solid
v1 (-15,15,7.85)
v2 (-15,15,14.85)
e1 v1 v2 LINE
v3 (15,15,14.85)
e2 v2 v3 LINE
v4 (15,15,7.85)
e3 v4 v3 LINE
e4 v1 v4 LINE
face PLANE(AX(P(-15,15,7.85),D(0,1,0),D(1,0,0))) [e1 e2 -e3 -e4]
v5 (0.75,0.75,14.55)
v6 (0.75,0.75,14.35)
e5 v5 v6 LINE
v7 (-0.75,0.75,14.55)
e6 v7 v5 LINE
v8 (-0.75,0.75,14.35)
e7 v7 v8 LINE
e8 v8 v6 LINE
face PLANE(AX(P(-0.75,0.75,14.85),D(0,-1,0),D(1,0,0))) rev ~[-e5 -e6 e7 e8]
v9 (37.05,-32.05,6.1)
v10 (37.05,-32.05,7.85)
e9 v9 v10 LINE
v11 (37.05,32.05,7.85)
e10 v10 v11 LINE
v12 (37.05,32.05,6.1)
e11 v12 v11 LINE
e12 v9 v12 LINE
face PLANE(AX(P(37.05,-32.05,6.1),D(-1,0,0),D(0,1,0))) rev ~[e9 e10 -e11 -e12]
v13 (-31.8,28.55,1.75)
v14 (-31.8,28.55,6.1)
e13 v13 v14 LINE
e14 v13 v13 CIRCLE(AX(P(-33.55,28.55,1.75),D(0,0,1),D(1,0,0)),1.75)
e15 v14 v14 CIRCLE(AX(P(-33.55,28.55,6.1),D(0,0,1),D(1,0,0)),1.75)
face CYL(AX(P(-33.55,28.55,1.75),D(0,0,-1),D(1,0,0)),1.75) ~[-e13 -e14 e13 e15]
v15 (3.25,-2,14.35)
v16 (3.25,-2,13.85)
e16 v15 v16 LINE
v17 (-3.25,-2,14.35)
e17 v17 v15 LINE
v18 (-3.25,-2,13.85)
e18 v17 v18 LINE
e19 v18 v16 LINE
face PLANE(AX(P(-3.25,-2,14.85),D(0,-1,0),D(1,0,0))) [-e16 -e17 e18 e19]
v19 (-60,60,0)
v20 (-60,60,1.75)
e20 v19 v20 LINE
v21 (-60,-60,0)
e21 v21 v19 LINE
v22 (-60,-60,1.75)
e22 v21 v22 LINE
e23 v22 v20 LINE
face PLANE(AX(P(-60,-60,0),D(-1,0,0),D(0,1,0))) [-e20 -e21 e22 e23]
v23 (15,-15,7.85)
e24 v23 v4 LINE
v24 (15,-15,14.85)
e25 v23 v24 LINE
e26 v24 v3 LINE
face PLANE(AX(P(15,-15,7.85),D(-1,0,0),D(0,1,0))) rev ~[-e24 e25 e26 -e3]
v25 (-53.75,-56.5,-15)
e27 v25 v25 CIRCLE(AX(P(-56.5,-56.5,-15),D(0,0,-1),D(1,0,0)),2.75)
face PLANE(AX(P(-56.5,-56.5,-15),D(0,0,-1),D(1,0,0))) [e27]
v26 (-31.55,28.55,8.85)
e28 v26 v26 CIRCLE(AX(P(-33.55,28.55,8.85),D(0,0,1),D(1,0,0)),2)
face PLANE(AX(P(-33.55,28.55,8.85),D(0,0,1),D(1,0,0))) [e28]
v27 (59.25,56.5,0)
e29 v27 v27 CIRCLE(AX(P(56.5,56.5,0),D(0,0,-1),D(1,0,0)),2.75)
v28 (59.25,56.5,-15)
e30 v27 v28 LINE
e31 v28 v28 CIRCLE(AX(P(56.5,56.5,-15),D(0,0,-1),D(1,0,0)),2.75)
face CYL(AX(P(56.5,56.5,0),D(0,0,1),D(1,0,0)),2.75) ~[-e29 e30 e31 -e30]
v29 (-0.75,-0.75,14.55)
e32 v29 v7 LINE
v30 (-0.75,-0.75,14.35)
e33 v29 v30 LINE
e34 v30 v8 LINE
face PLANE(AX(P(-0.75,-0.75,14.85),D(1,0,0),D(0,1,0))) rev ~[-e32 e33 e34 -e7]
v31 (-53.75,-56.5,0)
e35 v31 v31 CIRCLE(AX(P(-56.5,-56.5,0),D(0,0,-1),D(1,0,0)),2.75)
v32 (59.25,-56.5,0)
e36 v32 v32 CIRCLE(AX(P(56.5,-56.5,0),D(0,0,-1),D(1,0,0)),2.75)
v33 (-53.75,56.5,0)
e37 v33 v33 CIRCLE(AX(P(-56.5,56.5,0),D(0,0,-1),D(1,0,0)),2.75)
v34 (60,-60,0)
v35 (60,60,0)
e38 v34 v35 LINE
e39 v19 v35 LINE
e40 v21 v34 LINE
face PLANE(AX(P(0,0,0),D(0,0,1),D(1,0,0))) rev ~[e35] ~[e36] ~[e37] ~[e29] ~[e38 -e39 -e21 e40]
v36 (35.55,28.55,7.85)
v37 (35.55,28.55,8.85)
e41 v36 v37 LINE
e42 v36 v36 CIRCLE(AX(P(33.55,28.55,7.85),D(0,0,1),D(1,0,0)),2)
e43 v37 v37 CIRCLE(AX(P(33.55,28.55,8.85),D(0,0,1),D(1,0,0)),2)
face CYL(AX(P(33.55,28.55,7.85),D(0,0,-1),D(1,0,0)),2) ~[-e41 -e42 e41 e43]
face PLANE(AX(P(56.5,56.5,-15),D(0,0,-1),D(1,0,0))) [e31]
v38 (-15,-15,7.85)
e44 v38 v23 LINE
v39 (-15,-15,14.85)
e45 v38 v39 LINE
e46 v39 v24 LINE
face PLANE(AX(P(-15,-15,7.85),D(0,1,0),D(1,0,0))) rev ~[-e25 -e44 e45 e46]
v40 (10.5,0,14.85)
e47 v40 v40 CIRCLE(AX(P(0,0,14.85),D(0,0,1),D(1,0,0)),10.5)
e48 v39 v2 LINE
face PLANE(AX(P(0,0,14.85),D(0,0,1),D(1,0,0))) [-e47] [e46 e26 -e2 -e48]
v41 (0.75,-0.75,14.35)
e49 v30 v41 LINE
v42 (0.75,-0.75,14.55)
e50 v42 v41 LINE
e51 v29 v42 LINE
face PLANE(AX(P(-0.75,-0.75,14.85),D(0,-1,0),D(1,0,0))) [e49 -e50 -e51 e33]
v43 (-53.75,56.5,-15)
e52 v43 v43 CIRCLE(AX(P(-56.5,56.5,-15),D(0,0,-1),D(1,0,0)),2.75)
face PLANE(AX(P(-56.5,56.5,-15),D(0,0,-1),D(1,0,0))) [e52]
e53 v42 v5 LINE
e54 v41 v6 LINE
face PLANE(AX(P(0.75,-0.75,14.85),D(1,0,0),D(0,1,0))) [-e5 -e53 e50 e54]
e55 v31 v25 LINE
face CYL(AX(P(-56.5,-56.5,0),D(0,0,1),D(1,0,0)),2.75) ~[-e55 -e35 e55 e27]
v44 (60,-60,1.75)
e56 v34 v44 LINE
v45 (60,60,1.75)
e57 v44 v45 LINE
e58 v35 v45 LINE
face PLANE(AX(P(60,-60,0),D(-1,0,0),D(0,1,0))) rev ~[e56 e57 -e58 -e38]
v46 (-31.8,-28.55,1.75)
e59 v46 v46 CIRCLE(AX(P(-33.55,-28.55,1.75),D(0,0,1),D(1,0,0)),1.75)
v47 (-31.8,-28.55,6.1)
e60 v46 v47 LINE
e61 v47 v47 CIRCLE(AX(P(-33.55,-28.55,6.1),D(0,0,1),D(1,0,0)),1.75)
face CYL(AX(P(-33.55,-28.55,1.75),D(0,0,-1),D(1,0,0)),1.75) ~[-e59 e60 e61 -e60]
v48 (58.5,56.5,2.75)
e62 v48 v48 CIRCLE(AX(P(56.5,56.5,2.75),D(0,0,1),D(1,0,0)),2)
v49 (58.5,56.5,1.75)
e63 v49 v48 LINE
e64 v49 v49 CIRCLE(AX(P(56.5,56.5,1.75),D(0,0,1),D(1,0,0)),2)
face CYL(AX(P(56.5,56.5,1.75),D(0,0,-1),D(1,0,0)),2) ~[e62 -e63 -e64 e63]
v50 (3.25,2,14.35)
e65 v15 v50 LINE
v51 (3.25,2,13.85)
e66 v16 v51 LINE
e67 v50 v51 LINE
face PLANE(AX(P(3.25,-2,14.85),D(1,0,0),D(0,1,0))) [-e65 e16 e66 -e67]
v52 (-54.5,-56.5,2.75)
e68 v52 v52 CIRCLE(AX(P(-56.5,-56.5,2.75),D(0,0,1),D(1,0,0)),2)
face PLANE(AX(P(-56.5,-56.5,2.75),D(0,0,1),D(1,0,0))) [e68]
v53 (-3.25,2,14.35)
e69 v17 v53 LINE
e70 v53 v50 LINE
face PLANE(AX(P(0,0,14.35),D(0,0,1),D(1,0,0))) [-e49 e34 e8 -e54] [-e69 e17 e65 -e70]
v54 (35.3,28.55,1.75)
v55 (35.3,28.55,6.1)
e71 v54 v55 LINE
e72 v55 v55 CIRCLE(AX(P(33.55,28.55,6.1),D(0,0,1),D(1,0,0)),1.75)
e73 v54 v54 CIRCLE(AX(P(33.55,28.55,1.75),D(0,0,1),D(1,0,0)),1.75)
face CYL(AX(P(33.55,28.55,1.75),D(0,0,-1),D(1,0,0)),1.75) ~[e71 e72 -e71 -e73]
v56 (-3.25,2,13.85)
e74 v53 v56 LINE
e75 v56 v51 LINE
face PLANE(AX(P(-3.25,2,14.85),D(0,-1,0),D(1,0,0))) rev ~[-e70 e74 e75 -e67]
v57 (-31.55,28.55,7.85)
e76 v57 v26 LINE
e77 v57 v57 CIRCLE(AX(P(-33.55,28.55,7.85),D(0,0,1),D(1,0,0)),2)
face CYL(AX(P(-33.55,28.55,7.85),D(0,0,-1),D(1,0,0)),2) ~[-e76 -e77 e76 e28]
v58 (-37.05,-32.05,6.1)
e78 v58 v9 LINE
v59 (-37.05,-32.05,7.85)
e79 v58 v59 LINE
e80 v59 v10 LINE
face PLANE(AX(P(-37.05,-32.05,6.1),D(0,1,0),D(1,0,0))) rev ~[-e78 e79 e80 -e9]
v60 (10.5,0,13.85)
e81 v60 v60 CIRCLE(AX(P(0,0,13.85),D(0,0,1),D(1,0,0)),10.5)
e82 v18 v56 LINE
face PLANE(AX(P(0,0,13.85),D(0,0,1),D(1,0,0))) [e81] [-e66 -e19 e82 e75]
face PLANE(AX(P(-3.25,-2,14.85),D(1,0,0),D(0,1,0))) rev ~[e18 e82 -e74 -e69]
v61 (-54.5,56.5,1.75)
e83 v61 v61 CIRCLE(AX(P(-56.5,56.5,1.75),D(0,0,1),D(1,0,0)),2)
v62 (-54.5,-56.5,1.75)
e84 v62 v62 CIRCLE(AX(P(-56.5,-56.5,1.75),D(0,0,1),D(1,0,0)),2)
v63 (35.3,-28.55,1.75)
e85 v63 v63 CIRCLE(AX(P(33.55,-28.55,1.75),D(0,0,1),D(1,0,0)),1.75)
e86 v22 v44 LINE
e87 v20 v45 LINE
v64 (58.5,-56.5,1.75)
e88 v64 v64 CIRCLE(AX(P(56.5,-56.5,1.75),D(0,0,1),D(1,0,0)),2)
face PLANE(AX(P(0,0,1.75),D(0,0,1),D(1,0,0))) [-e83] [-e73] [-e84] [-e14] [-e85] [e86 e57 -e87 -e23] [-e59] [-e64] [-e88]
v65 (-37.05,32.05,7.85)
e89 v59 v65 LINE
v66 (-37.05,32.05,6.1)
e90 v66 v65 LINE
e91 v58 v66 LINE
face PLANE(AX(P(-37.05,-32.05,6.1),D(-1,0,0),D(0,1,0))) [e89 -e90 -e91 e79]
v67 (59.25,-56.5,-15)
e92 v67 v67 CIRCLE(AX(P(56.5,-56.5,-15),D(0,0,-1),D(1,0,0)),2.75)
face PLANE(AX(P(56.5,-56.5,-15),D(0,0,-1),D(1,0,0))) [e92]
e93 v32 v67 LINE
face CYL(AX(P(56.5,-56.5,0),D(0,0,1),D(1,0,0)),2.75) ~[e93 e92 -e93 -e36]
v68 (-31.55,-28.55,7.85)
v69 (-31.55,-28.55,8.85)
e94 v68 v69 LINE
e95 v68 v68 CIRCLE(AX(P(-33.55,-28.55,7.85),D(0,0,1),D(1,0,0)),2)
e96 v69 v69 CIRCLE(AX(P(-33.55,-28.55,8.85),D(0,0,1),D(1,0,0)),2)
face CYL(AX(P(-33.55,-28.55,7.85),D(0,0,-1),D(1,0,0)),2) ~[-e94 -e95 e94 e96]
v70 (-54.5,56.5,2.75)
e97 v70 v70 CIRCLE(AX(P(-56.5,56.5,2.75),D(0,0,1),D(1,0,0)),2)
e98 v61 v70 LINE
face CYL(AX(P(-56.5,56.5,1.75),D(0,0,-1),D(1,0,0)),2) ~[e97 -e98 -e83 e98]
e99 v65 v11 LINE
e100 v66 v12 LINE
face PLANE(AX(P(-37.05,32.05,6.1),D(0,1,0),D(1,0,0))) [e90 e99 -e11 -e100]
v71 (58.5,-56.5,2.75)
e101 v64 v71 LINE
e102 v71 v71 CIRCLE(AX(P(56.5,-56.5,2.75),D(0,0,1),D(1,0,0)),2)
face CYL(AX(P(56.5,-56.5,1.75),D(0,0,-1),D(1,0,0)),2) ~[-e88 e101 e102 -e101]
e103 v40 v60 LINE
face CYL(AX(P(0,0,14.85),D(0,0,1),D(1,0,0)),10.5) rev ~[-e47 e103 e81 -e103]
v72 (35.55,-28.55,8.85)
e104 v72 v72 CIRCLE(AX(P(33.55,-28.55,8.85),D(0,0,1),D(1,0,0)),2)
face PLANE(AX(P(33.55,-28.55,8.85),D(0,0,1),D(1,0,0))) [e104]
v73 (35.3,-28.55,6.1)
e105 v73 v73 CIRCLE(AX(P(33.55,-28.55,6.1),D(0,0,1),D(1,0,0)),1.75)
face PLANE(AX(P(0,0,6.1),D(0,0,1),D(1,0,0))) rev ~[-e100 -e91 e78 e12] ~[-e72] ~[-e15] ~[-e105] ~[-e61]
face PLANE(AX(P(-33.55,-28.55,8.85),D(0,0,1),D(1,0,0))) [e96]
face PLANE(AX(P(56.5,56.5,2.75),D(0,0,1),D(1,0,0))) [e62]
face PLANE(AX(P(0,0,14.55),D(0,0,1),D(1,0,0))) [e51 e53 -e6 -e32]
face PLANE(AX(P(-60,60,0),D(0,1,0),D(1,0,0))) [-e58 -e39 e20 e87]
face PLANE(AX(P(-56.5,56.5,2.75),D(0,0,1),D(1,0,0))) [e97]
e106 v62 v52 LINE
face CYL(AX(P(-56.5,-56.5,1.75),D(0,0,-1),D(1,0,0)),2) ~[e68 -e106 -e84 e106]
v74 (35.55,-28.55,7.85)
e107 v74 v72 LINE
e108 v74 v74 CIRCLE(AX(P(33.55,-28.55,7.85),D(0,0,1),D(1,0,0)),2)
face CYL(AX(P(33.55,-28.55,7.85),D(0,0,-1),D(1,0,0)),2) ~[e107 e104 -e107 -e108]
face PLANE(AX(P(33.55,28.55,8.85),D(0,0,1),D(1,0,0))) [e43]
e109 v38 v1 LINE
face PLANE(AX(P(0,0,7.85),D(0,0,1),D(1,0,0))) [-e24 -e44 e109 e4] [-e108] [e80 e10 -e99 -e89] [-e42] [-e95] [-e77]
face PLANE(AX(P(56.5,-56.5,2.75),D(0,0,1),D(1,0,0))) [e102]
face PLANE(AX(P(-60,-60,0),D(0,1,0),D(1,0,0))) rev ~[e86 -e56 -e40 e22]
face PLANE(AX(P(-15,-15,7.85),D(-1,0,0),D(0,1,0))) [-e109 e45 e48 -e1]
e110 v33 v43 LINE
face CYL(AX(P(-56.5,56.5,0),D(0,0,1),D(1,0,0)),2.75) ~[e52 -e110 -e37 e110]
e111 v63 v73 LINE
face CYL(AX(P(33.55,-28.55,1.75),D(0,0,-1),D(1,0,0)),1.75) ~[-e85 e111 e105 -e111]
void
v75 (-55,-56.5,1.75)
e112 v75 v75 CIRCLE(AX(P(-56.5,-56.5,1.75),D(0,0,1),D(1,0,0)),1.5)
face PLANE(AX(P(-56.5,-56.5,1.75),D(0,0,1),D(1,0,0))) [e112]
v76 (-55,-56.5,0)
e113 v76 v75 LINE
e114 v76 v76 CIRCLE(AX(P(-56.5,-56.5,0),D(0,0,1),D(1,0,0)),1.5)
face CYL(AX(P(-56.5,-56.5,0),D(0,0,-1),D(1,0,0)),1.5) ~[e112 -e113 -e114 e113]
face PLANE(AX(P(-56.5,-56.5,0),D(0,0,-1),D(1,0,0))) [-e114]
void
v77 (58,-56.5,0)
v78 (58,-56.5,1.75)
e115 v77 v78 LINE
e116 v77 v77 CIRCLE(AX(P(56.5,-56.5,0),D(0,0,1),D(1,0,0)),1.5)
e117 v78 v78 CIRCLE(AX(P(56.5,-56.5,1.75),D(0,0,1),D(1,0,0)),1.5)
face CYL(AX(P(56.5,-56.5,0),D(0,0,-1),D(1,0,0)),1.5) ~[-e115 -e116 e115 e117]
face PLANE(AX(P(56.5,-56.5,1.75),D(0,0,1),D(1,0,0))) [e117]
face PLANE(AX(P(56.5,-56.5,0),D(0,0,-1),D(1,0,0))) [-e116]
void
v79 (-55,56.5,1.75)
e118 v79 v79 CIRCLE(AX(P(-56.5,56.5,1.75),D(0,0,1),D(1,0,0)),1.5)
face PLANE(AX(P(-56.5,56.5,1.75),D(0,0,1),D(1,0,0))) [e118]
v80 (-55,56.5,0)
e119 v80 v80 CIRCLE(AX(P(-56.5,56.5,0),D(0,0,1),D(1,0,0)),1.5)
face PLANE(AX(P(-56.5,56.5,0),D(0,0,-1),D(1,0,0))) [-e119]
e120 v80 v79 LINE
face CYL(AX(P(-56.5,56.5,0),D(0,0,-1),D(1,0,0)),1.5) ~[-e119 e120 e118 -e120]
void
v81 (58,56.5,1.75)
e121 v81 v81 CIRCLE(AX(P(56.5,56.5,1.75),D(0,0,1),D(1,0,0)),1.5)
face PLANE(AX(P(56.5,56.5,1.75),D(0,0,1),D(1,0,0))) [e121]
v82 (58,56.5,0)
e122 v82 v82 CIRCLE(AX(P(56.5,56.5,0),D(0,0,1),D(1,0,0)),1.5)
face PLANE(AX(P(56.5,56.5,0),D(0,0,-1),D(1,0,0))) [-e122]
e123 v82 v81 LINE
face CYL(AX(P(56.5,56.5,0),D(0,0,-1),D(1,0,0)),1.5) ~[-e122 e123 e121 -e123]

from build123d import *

# Parameters (mm, degrees)
F0_W      = 120
F0_H      = 120
F0_R      = 1.5
F1_DEPTH  = 1.75
F2_R      = 2.75
F2_R_2    = 1.5
F3_DEPTH  = 15
F4_R      = 2
F4_R_2    = 1.5
F5_DEPTH  = 1
F4_R_3    = 1.75
F6_DEPTH  = 4.35
F7_W      = 74.1
F7_H      = 64.1
F8_DEPTH  = 1.75
F9_R      = 2
F10_DEPTH = 1
F9_W      = 30
F9_H      = 30
F11_DEPTH = 7
F12_R     = 10.5
F12_W     = 6.5
F12_H     = 4
F13_DEPTH = 1
F12_W_2   = 1.5
F12_H_2   = 1.5
F14_DEPTH = 0.3
F15_DEPTH = 0.5


with BuildPart() as f1:
    # F0 (on Top) → F1 (new body)
    with BuildSketch(Plane.XY):
        Rectangle(F0_W, F0_H)
        with Locations((-56.5, -56.5)):
            Circle(F0_R, mode=Mode.SUBTRACT)
        with Locations((56.5, -56.5)):
            Circle(F0_R, mode=Mode.SUBTRACT)
        with Locations((-56.5, 56.5)):
            Circle(F0_R, mode=Mode.SUBTRACT)
        with Locations((56.5, 56.5)):
            Circle(F0_R, mode=Mode.SUBTRACT)
    extrude(amount=F1_DEPTH)

    # F2 (on face) → F3 (join)
    with BuildSketch(Plane(origin=(0, 0, 0), x_dir=(1, 0, 0), z_dir=(0, 0, -1))):
        with Locations((56.5, -56.5)):
            Circle(F2_R)
        with Locations((56.5, -56.5)):
            Circle(F2_R_2, mode=Mode.SUBTRACT)
        with Locations((-56.5, -56.5)):
            Circle(F2_R)
        with Locations((-56.5, -56.5)):
            Circle(F2_R_2, mode=Mode.SUBTRACT)
        with Locations((-56.5, 56.5)):
            Circle(F2_R)
        with Locations((-56.5, 56.5)):
            Circle(F2_R_2, mode=Mode.SUBTRACT)
        with Locations((56.5, 56.5)):
            Circle(F2_R)
        with Locations((56.5, 56.5)):
            Circle(F2_R_2, mode=Mode.SUBTRACT)
        with Locations((-56.5, 56.5)):
            Circle(F2_R_2)
        with Locations((56.5, 56.5)):
            Circle(F2_R_2)
        with Locations((-56.5, -56.5)):
            Circle(F2_R_2)
        with Locations((56.5, -56.5)):
            Circle(F2_R_2)
    extrude(amount=F3_DEPTH)

    # F4 (on face) → F5 (join)
    with BuildSketch(Plane.XY.offset(1.75)):
        with Locations((-56.5, 56.5)):
            Circle(F4_R)
        with Locations((-56.5, 56.5)):
            Circle(F4_R_2, mode=Mode.SUBTRACT)
        with Locations((-56.5, 56.5)):
            Circle(F4_R_2)
        with Locations((56.5, 56.5)):
            Circle(F4_R)
        with Locations((56.5, 56.5)):
            Circle(F4_R_2, mode=Mode.SUBTRACT)
        with Locations((56.5, 56.5)):
            Circle(F4_R_2)
        with Locations((56.5, -56.5)):
            Circle(F4_R)
        with Locations((56.5, -56.5)):
            Circle(F4_R_2, mode=Mode.SUBTRACT)
        with Locations((56.5, -56.5)):
            Circle(F4_R_2)
        with Locations((-56.5, -56.5)):
            Circle(F4_R)
        with Locations((-56.5, -56.5)):
            Circle(F4_R_2, mode=Mode.SUBTRACT)
        with Locations((-56.5, -56.5)):
            Circle(F4_R_2)
    extrude(amount=F5_DEPTH)

    # F4 (on face) → F6 (join)
    with BuildSketch(Plane.XY.offset(1.75)):
        with Locations((-33.55, -28.55)):
            Circle(F4_R_3)
        with Locations((33.55, -28.55)):
            Circle(F4_R_3)
        with Locations((33.55, 28.55)):
            Circle(F4_R_3)
        with Locations((-33.55, 28.55)):
            Circle(F4_R_3)
    extrude(amount=F6_DEPTH)

    # F7 (on face) → F8 (join)
    with BuildSketch(Plane.XY.offset(6.1)):
        Rectangle(F7_W, F7_H)
    extrude(amount=F8_DEPTH)

    # F9 (on face) → F10 (join)
    with BuildSketch(Plane.XY.offset(7.85)):
        with Locations((33.55, 28.55)):
            Circle(F9_R)
        with Locations((-33.55, 28.55)):
            Circle(F9_R)
        with Locations((33.55, -28.55)):
            Circle(F9_R)
        with Locations((-33.55, -28.55)):
            Circle(F9_R)
    extrude(amount=F10_DEPTH)

    # F9 (on face) → F11 (join)
    with BuildSketch(Plane.XY.offset(7.85)):
        Rectangle(F9_W, F9_H)
    extrude(amount=F11_DEPTH)

    # F12 (on face) → F13 (cut)
    with BuildSketch(Plane.XY.offset(14.85)):
        Circle(F12_R)
        Rectangle(F12_W, F12_H, mode=Mode.SUBTRACT)
    extrude(amount=-F13_DEPTH, mode=Mode.SUBTRACT)

    # F12 (on face) → F14 (cut)
    with BuildSketch(Plane.XY.offset(14.85)):
        Rectangle(F12_W_2, F12_H_2)
    extrude(amount=-F14_DEPTH, mode=Mode.SUBTRACT)

    # F12 (on face) → F15 (cut)
    with BuildSketch(Plane.XY.offset(14.85)):
        Rectangle(F12_W, F12_H)
        Rectangle(F12_W_2, F12_H_2, mode=Mode.SUBTRACT)
    extrude(amount=-F15_DEPTH, mode=Mode.SUBTRACT)


solid = f1.part
